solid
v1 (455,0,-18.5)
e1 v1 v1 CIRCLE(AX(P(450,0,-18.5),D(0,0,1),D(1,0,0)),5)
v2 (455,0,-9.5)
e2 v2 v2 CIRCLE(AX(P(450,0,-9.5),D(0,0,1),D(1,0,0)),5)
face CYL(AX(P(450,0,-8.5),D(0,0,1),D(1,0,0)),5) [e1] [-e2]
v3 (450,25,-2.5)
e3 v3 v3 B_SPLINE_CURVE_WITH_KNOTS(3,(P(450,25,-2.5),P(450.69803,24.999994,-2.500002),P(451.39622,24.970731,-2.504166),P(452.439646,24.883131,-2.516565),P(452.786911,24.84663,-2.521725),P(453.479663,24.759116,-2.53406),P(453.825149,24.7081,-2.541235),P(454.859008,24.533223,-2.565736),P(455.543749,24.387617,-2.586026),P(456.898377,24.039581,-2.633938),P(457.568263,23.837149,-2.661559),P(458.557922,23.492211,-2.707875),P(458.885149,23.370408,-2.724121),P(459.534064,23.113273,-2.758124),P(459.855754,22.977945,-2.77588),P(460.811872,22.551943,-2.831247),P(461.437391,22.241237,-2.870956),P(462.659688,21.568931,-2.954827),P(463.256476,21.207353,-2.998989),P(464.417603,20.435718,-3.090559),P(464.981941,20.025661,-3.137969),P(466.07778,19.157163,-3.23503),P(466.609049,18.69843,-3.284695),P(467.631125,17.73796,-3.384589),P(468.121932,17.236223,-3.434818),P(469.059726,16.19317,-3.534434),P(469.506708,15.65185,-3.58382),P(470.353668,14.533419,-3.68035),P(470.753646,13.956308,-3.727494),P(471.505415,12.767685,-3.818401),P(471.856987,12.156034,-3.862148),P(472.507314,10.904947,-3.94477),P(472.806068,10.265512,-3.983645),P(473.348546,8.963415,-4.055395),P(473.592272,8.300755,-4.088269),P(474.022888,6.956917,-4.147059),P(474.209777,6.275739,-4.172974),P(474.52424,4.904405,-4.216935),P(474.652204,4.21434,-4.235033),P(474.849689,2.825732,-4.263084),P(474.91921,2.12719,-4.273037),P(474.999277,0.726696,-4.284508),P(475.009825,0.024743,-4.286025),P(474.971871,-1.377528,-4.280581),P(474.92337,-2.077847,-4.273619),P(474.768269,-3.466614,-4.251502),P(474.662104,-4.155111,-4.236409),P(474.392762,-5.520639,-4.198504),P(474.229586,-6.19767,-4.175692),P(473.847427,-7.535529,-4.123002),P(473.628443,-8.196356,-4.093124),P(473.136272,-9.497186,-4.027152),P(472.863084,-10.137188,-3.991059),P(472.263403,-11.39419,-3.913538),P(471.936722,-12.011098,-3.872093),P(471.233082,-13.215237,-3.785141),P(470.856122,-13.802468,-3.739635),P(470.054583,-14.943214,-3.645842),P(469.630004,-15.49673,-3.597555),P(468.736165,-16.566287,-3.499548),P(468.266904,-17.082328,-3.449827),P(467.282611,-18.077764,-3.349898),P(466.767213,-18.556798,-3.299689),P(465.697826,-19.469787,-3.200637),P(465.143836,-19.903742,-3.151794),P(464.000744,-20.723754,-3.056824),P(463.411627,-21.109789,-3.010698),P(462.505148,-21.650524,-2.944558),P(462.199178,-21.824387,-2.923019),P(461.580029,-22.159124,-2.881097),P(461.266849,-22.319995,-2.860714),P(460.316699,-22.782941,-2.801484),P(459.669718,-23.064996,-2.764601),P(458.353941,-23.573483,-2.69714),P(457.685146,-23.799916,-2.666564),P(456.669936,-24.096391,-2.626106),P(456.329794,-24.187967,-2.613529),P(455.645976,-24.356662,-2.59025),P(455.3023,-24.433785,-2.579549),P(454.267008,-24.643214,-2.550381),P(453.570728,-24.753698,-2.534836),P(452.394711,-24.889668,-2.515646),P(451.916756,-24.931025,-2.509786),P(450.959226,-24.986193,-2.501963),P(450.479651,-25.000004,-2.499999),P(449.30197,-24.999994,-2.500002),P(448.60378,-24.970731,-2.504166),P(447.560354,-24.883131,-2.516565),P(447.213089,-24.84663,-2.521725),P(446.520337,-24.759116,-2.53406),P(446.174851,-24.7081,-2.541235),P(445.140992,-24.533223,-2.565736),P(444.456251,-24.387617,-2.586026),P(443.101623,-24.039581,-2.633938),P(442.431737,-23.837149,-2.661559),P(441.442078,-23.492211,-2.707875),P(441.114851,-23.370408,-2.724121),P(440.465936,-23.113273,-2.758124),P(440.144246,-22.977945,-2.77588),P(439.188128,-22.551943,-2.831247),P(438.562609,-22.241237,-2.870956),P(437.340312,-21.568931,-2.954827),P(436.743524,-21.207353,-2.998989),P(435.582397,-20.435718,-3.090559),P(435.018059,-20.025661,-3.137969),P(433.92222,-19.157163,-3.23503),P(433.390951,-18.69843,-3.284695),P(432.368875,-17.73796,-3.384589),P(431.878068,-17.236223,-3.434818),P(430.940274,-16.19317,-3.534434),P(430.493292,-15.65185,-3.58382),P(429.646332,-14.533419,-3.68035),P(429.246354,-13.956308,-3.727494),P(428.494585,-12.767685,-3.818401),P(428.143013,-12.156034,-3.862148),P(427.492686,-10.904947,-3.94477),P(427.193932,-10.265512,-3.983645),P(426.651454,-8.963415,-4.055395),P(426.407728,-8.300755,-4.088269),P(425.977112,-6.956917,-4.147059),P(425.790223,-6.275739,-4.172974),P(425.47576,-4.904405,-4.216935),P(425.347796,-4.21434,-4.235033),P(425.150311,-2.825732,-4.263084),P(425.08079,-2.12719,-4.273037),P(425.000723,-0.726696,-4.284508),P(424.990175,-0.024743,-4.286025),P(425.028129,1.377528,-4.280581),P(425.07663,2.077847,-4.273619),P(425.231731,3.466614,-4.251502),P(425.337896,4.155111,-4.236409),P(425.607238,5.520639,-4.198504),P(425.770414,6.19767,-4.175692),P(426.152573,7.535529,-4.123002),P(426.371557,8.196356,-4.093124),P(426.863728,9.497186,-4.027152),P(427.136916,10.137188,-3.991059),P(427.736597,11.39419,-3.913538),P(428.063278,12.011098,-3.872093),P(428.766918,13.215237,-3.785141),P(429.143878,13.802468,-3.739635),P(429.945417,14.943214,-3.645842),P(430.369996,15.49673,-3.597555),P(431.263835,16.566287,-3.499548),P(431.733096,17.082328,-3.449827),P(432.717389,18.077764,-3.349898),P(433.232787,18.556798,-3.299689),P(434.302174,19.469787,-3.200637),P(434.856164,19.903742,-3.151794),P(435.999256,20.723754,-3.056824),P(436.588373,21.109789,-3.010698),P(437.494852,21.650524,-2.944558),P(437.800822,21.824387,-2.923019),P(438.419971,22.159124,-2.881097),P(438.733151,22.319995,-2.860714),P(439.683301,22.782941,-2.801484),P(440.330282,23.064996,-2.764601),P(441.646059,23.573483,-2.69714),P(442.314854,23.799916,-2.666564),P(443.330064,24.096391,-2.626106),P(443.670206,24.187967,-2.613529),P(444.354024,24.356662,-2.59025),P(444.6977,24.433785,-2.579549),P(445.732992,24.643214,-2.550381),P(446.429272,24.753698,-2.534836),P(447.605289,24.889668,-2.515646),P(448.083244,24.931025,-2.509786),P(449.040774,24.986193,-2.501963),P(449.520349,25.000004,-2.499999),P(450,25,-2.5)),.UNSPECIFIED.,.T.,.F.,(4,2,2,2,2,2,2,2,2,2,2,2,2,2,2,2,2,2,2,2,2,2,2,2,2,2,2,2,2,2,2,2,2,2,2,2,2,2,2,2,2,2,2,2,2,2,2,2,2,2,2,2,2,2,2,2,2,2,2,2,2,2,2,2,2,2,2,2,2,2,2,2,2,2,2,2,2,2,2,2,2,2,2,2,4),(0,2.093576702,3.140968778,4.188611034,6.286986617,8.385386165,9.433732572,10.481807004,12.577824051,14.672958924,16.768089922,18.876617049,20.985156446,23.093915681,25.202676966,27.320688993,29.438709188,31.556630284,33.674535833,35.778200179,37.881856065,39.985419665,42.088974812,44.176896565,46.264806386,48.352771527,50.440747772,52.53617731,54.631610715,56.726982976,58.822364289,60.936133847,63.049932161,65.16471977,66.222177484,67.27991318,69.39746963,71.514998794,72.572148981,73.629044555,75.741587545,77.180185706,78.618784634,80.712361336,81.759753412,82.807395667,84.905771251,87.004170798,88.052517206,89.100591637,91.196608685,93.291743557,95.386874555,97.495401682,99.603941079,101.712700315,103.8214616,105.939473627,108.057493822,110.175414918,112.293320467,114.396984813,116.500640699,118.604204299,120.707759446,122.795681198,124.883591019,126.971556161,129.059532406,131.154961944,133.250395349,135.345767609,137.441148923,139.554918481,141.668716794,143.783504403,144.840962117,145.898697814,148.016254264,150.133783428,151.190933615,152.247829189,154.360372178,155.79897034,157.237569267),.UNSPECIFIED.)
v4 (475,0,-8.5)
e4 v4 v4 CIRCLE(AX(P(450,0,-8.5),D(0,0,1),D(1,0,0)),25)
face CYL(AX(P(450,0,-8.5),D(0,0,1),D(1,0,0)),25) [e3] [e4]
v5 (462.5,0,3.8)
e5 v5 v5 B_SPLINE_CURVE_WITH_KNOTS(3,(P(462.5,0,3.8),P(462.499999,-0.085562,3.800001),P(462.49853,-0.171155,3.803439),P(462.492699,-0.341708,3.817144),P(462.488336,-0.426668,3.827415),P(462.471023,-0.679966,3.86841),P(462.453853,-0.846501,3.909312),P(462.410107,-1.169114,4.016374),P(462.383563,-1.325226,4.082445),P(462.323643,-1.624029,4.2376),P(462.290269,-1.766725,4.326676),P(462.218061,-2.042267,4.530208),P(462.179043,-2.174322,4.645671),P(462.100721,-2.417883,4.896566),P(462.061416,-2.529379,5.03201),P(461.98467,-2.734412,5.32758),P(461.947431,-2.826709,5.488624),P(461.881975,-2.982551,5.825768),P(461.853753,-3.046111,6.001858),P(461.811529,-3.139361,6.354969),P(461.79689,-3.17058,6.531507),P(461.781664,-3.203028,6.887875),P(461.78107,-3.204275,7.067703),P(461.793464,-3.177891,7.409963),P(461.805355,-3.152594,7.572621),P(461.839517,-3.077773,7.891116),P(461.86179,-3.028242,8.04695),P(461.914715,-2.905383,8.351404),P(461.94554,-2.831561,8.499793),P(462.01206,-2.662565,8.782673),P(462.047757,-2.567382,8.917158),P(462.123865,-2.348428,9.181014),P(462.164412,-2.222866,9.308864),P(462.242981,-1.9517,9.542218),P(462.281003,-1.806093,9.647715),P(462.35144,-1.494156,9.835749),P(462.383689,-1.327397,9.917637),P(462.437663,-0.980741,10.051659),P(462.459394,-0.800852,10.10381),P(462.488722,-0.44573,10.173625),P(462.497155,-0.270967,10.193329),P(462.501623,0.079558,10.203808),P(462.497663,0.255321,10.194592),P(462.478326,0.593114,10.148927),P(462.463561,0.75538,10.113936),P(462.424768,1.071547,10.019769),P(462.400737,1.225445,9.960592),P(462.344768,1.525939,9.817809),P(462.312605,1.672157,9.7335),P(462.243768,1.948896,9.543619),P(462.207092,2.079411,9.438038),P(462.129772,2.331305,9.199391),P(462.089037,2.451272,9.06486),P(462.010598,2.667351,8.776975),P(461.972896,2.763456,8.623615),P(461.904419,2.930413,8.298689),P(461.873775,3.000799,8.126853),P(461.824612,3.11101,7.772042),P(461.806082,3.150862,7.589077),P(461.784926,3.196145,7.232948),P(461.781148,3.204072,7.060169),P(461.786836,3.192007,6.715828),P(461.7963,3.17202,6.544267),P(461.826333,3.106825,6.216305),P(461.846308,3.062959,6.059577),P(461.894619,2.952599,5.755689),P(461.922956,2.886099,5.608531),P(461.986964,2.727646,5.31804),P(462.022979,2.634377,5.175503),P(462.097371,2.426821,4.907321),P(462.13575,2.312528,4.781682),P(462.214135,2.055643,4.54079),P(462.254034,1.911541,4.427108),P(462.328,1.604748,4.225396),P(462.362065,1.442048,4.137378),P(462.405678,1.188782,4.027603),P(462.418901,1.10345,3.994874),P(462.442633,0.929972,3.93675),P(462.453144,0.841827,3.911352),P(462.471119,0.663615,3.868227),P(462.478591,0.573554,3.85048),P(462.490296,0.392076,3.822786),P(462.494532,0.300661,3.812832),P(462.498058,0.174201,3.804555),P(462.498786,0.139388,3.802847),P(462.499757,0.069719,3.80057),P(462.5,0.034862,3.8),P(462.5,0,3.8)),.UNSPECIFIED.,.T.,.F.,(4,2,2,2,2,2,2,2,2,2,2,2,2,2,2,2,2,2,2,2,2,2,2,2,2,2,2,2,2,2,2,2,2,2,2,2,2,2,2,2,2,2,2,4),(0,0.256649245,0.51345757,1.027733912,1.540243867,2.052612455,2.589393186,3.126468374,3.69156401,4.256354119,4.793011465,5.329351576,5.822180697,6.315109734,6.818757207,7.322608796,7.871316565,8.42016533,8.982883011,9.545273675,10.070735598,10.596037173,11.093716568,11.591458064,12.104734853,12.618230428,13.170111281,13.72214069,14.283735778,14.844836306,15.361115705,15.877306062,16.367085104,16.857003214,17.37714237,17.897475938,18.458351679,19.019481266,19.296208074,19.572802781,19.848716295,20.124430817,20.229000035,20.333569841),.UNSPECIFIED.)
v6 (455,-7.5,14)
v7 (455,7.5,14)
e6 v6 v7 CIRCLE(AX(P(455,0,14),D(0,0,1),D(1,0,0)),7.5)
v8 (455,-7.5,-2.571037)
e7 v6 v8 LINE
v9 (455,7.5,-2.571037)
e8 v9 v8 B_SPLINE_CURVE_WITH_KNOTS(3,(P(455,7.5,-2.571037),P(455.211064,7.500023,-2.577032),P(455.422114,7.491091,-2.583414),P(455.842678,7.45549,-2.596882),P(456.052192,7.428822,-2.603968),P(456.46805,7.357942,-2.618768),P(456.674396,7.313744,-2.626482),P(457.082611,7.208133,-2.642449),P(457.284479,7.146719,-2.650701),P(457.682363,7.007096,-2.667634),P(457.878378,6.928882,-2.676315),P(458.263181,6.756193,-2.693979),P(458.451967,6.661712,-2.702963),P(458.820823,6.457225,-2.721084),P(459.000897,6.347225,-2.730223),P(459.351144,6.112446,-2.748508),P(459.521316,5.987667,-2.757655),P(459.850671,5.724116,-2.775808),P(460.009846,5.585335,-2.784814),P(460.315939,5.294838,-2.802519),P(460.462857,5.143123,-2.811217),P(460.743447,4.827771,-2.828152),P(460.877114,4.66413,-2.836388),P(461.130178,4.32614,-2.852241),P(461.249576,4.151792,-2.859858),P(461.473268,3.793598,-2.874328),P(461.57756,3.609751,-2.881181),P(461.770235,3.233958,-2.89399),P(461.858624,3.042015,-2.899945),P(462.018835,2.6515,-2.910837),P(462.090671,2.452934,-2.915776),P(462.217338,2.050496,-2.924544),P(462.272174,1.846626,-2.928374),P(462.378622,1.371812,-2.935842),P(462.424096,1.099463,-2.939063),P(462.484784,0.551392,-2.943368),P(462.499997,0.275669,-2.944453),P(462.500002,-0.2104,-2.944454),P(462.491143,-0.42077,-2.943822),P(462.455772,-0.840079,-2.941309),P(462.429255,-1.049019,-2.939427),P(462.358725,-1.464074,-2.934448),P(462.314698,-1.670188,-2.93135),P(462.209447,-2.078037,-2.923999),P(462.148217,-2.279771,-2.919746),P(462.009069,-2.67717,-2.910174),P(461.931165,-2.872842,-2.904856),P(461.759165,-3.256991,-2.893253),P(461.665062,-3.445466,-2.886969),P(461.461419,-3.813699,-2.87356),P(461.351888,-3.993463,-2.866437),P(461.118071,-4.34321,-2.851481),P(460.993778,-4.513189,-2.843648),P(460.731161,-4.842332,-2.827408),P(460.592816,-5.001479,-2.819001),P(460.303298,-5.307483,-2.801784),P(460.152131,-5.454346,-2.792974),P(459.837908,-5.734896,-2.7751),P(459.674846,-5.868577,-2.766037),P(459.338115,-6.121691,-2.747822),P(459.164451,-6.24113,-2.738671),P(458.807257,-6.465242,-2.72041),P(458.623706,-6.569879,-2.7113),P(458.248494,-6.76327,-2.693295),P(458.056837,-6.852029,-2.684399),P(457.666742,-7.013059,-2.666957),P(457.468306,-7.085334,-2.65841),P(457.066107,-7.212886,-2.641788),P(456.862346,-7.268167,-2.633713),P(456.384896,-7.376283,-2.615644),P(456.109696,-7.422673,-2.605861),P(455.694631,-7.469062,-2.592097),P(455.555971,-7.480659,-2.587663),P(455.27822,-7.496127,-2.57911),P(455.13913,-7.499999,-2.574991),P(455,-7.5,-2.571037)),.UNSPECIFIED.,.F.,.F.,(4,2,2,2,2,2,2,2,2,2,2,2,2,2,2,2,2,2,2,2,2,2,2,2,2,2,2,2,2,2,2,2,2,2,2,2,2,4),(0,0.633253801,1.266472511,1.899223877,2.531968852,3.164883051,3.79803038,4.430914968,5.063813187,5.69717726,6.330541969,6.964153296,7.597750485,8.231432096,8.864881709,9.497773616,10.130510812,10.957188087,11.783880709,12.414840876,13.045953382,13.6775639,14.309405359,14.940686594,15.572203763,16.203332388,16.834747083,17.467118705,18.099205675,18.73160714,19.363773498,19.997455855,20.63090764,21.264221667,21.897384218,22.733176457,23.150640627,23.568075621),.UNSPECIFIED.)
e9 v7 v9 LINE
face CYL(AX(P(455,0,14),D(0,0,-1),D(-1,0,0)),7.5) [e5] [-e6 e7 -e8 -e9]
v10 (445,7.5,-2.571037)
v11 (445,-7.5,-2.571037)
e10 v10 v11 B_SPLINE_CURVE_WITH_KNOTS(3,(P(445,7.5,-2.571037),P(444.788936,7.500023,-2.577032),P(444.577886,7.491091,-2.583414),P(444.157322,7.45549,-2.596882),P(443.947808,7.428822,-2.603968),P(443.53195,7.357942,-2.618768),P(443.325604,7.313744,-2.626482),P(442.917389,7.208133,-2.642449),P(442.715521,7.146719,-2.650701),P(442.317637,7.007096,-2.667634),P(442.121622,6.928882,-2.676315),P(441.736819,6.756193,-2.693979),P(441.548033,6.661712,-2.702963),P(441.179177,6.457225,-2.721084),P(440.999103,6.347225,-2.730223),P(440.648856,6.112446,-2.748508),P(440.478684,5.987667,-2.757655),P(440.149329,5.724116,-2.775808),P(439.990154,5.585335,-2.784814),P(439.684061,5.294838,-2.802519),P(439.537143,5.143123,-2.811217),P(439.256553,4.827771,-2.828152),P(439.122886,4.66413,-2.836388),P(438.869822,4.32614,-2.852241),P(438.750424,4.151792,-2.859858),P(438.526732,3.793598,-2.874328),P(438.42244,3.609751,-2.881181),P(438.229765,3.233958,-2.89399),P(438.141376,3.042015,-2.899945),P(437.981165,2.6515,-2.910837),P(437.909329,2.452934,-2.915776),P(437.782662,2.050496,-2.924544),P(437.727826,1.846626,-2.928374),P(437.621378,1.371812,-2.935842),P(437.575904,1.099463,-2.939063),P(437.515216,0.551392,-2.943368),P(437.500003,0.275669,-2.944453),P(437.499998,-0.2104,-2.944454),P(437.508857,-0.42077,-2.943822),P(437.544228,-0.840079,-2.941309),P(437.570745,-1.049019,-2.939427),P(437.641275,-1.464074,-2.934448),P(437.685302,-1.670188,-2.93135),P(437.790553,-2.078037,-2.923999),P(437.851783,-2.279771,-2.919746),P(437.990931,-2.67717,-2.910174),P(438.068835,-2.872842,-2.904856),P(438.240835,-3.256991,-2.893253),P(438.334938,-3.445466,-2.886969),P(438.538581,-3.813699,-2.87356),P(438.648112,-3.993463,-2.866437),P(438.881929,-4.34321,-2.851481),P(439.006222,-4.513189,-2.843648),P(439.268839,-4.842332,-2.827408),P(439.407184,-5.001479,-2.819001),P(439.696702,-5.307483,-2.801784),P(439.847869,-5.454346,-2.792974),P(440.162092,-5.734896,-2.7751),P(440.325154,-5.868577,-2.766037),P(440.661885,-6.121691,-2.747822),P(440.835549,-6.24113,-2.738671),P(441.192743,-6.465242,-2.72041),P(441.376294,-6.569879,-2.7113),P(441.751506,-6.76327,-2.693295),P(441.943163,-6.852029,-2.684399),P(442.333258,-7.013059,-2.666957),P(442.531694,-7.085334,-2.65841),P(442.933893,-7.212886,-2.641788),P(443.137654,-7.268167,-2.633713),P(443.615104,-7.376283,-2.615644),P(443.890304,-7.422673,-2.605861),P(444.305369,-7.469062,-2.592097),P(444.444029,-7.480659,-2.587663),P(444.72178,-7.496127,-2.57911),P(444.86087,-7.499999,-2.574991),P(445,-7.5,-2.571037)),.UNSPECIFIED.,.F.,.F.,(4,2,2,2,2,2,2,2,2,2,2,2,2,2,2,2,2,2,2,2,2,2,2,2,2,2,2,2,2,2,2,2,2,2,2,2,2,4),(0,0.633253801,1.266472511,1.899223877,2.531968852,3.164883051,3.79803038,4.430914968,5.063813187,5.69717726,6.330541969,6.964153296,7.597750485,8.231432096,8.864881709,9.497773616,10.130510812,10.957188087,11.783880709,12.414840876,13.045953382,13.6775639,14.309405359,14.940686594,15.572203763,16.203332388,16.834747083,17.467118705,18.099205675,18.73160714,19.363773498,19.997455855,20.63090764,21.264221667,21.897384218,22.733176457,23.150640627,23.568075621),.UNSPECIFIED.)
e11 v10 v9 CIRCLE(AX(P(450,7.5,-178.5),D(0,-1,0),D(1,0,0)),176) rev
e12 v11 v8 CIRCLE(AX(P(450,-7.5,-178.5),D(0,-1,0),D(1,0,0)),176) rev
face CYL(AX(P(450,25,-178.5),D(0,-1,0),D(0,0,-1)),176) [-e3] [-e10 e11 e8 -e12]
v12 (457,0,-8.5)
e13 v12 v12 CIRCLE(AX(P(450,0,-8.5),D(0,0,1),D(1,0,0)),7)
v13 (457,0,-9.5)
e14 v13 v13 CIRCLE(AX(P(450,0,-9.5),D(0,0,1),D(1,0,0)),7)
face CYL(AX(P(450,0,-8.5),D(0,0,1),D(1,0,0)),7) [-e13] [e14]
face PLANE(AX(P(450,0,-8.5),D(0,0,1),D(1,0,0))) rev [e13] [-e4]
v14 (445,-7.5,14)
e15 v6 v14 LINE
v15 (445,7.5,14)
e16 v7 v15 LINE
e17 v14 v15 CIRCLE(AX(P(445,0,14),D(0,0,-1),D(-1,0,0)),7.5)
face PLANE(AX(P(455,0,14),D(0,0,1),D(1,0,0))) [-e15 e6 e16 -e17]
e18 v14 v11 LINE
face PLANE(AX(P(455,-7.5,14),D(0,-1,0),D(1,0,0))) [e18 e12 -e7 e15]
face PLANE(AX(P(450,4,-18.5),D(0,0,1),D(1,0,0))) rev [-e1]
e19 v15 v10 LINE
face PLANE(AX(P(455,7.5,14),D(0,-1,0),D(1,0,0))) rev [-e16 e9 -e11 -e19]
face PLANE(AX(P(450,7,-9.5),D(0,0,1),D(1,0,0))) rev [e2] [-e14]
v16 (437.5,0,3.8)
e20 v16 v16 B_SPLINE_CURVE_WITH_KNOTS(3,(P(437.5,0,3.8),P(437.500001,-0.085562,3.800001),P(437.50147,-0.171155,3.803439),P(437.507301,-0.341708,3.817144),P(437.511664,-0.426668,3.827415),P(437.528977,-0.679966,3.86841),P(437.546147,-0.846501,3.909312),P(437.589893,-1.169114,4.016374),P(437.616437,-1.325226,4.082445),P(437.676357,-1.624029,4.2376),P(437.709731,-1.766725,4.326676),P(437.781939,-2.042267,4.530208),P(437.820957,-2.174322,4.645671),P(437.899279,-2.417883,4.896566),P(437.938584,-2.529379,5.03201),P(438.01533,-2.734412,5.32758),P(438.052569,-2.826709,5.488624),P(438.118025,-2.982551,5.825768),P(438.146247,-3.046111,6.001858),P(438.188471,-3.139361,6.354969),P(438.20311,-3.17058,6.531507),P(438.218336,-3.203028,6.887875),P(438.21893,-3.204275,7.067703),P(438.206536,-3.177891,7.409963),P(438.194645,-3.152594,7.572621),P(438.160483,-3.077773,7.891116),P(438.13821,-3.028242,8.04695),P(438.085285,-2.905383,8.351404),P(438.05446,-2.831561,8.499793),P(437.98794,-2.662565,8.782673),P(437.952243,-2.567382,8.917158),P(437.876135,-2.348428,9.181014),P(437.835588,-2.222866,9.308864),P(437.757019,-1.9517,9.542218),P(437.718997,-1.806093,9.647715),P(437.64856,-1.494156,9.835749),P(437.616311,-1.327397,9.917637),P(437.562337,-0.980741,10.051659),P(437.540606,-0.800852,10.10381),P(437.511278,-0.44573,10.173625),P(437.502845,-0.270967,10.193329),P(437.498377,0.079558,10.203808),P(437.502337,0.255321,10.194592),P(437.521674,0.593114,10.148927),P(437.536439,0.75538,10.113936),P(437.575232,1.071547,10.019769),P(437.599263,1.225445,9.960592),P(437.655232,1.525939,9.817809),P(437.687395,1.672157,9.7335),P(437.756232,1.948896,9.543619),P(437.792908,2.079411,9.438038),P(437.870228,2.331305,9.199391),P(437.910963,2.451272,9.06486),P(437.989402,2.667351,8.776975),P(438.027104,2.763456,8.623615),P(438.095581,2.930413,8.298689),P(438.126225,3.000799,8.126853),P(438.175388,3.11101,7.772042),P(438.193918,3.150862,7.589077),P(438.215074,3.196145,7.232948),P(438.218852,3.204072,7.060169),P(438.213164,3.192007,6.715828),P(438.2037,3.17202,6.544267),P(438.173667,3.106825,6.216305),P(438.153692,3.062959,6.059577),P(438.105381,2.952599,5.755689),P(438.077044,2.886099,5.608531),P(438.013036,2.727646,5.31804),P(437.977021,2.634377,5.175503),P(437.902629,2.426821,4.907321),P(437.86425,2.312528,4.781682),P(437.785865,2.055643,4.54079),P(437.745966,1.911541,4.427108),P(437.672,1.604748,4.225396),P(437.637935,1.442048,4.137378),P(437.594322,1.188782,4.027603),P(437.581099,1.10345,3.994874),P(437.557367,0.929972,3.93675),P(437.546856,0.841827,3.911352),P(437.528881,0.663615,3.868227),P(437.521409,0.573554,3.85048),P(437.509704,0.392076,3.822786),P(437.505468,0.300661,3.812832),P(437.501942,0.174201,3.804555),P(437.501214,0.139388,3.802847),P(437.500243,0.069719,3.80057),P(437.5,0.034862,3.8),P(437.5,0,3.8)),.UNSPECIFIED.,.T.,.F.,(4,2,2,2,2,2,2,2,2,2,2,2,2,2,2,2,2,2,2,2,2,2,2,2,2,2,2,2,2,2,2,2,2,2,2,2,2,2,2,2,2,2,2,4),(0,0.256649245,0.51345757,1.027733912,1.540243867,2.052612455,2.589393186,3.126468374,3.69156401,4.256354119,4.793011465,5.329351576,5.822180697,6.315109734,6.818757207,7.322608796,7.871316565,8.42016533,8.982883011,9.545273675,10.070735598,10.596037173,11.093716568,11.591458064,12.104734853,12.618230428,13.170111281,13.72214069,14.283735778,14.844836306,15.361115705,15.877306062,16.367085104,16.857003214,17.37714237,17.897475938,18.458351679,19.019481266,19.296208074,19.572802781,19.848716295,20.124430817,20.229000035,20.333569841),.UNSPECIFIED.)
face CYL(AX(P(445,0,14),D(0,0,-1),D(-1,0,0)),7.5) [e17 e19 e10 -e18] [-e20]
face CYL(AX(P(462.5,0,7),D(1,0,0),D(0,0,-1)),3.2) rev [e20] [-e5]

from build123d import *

# Parameters (mm, degrees)
AUFSATZ_LINEAR_START             = -2.5
SKIZZE2_R                        = 25
AUFSATZ_LINEAR_AUSTRAGEN1_DEPTH  = 6
SCHNITT_LINEAR_AUSTRAGEN2_DEPTH  = 476.733381213
AUFSATZ_LINEAR_START_2           = -2.944453
AUFSATZ_LINEAR_AUSTRAGEN5_DEPTH  = 16.944453
SPIEGELN4_START                  = -2.944453335
SPIEGELN4_DEPTH                  = 16.944453335
F_6_4_6_4_DURCHMESSER_BOHRUNG1_D = 6.4


# Read off the part's stored shape, not the designer's step: Spiegeln4
with BuildPart() as part:
    # Skizze2 → Aufsatz-Linear austragen1 (new body)
    with BuildSketch(Plane.XY.offset(AUFSATZ_LINEAR_START)):
        with Locations((450, 0)):
            Circle(SKIZZE2_R)
    extrude(amount=-AUFSATZ_LINEAR_AUSTRAGEN1_DEPTH)

    # Skizze8 → Schnitt-Linear austragen2 (cut, symmetric)
    with BuildSketch(Plane(origin=(0, 0, 0), x_dir=(1, 0, 0), z_dir=(0, 1, 0))):
        with BuildLine():
            Line((450, 2.5), (475, 2.5))
            Line((475, 2.5), (475, 4.284616064))
            ThreePointArc((475, 4.284616064), (462.531808075, 2.946720947), (450, 2.5))
        make_face()
    schnitt_linear_austragen2 = extrude(amount=SCHNITT_LINEAR_AUSTRAGEN2_DEPTH, both=True, mode=Mode.SUBTRACT)

    # Spiegeln1: Schnitt-Linear austragen2 across plane
    add(schnitt_linear_austragen2.mirror(Plane(origin=(450, 0, 0), x_dir=(0, 0, 1), z_dir=(1, 0, 0))), mode=Mode.SUBTRACT)

    # Skizze3 → Aufsatz-Linear austragen5 (add)
    with BuildSketch(Plane.XY.offset(AUFSATZ_LINEAR_START_2)):
        with BuildLine():
            Line((450, 0), (462.5, 0))
            ThreePointArc((462.5, 0), (460.303300859, 5.303300859), (455, 7.5))
            Line((455, 7.5), (450, 7.5))
            Line((450, 7.5), (450, 0))
        make_face()
    extrude(amount=AUFSATZ_LINEAR_AUSTRAGEN5_DEPTH)

    # Spiegeln4 outline → Spiegeln4 (add)
    with BuildSketch(Plane.XY.offset(SPIEGELN4_START)):
        with BuildLine():
            ThreePointArc((455, -7.5), (460.303300859, -5.303300859), (462.5, 0))
            Line((462.5, 0), (450, 0))
            Line((450, 0), (450, 7.5))
            Line((450, 7.5), (445, 7.5))
            ThreePointArc((445, 7.5), (437.5, 0), (445, -7.5))
            Line((445, -7.5), (455, -7.5))
        make_face()
    extrude(amount=SPIEGELN4_DEPTH)

    # Skizze4 → Rotation1 (revolve)
    with BuildSketch(Plane(origin=(450, 0, 0), x_dir=(0, 0, -1), z_dir=(1, 0, 0)), mode=Mode.PRIVATE) as rotation1_sk:
        Polygon((9.5, 7), (8.5, 7), (8.5, 0), (18.5, 0), (18.5, 4), (18.5, 5), (9.5, 5), align=None)
    revolve(rotation1_sk.sketch.rotate(Axis((450, 0, -8.5), (0, 0, -1)), 90), axis=Axis((450, 0, -8.5), (0, 0, -1)))

    # Ø6.4 (6.4) Durchmesser Bohrung1 (through all)
    with Locations(Plane(origin=(462.5, 0, 0), x_dir=(0, 0, -1), z_dir=(1, 0, 0))):
        with Locations((-7, 0)):
            Hole(F_6_4_6_4_DURCHMESSER_BOHRUNG1_D / 2)


solid = part.part
